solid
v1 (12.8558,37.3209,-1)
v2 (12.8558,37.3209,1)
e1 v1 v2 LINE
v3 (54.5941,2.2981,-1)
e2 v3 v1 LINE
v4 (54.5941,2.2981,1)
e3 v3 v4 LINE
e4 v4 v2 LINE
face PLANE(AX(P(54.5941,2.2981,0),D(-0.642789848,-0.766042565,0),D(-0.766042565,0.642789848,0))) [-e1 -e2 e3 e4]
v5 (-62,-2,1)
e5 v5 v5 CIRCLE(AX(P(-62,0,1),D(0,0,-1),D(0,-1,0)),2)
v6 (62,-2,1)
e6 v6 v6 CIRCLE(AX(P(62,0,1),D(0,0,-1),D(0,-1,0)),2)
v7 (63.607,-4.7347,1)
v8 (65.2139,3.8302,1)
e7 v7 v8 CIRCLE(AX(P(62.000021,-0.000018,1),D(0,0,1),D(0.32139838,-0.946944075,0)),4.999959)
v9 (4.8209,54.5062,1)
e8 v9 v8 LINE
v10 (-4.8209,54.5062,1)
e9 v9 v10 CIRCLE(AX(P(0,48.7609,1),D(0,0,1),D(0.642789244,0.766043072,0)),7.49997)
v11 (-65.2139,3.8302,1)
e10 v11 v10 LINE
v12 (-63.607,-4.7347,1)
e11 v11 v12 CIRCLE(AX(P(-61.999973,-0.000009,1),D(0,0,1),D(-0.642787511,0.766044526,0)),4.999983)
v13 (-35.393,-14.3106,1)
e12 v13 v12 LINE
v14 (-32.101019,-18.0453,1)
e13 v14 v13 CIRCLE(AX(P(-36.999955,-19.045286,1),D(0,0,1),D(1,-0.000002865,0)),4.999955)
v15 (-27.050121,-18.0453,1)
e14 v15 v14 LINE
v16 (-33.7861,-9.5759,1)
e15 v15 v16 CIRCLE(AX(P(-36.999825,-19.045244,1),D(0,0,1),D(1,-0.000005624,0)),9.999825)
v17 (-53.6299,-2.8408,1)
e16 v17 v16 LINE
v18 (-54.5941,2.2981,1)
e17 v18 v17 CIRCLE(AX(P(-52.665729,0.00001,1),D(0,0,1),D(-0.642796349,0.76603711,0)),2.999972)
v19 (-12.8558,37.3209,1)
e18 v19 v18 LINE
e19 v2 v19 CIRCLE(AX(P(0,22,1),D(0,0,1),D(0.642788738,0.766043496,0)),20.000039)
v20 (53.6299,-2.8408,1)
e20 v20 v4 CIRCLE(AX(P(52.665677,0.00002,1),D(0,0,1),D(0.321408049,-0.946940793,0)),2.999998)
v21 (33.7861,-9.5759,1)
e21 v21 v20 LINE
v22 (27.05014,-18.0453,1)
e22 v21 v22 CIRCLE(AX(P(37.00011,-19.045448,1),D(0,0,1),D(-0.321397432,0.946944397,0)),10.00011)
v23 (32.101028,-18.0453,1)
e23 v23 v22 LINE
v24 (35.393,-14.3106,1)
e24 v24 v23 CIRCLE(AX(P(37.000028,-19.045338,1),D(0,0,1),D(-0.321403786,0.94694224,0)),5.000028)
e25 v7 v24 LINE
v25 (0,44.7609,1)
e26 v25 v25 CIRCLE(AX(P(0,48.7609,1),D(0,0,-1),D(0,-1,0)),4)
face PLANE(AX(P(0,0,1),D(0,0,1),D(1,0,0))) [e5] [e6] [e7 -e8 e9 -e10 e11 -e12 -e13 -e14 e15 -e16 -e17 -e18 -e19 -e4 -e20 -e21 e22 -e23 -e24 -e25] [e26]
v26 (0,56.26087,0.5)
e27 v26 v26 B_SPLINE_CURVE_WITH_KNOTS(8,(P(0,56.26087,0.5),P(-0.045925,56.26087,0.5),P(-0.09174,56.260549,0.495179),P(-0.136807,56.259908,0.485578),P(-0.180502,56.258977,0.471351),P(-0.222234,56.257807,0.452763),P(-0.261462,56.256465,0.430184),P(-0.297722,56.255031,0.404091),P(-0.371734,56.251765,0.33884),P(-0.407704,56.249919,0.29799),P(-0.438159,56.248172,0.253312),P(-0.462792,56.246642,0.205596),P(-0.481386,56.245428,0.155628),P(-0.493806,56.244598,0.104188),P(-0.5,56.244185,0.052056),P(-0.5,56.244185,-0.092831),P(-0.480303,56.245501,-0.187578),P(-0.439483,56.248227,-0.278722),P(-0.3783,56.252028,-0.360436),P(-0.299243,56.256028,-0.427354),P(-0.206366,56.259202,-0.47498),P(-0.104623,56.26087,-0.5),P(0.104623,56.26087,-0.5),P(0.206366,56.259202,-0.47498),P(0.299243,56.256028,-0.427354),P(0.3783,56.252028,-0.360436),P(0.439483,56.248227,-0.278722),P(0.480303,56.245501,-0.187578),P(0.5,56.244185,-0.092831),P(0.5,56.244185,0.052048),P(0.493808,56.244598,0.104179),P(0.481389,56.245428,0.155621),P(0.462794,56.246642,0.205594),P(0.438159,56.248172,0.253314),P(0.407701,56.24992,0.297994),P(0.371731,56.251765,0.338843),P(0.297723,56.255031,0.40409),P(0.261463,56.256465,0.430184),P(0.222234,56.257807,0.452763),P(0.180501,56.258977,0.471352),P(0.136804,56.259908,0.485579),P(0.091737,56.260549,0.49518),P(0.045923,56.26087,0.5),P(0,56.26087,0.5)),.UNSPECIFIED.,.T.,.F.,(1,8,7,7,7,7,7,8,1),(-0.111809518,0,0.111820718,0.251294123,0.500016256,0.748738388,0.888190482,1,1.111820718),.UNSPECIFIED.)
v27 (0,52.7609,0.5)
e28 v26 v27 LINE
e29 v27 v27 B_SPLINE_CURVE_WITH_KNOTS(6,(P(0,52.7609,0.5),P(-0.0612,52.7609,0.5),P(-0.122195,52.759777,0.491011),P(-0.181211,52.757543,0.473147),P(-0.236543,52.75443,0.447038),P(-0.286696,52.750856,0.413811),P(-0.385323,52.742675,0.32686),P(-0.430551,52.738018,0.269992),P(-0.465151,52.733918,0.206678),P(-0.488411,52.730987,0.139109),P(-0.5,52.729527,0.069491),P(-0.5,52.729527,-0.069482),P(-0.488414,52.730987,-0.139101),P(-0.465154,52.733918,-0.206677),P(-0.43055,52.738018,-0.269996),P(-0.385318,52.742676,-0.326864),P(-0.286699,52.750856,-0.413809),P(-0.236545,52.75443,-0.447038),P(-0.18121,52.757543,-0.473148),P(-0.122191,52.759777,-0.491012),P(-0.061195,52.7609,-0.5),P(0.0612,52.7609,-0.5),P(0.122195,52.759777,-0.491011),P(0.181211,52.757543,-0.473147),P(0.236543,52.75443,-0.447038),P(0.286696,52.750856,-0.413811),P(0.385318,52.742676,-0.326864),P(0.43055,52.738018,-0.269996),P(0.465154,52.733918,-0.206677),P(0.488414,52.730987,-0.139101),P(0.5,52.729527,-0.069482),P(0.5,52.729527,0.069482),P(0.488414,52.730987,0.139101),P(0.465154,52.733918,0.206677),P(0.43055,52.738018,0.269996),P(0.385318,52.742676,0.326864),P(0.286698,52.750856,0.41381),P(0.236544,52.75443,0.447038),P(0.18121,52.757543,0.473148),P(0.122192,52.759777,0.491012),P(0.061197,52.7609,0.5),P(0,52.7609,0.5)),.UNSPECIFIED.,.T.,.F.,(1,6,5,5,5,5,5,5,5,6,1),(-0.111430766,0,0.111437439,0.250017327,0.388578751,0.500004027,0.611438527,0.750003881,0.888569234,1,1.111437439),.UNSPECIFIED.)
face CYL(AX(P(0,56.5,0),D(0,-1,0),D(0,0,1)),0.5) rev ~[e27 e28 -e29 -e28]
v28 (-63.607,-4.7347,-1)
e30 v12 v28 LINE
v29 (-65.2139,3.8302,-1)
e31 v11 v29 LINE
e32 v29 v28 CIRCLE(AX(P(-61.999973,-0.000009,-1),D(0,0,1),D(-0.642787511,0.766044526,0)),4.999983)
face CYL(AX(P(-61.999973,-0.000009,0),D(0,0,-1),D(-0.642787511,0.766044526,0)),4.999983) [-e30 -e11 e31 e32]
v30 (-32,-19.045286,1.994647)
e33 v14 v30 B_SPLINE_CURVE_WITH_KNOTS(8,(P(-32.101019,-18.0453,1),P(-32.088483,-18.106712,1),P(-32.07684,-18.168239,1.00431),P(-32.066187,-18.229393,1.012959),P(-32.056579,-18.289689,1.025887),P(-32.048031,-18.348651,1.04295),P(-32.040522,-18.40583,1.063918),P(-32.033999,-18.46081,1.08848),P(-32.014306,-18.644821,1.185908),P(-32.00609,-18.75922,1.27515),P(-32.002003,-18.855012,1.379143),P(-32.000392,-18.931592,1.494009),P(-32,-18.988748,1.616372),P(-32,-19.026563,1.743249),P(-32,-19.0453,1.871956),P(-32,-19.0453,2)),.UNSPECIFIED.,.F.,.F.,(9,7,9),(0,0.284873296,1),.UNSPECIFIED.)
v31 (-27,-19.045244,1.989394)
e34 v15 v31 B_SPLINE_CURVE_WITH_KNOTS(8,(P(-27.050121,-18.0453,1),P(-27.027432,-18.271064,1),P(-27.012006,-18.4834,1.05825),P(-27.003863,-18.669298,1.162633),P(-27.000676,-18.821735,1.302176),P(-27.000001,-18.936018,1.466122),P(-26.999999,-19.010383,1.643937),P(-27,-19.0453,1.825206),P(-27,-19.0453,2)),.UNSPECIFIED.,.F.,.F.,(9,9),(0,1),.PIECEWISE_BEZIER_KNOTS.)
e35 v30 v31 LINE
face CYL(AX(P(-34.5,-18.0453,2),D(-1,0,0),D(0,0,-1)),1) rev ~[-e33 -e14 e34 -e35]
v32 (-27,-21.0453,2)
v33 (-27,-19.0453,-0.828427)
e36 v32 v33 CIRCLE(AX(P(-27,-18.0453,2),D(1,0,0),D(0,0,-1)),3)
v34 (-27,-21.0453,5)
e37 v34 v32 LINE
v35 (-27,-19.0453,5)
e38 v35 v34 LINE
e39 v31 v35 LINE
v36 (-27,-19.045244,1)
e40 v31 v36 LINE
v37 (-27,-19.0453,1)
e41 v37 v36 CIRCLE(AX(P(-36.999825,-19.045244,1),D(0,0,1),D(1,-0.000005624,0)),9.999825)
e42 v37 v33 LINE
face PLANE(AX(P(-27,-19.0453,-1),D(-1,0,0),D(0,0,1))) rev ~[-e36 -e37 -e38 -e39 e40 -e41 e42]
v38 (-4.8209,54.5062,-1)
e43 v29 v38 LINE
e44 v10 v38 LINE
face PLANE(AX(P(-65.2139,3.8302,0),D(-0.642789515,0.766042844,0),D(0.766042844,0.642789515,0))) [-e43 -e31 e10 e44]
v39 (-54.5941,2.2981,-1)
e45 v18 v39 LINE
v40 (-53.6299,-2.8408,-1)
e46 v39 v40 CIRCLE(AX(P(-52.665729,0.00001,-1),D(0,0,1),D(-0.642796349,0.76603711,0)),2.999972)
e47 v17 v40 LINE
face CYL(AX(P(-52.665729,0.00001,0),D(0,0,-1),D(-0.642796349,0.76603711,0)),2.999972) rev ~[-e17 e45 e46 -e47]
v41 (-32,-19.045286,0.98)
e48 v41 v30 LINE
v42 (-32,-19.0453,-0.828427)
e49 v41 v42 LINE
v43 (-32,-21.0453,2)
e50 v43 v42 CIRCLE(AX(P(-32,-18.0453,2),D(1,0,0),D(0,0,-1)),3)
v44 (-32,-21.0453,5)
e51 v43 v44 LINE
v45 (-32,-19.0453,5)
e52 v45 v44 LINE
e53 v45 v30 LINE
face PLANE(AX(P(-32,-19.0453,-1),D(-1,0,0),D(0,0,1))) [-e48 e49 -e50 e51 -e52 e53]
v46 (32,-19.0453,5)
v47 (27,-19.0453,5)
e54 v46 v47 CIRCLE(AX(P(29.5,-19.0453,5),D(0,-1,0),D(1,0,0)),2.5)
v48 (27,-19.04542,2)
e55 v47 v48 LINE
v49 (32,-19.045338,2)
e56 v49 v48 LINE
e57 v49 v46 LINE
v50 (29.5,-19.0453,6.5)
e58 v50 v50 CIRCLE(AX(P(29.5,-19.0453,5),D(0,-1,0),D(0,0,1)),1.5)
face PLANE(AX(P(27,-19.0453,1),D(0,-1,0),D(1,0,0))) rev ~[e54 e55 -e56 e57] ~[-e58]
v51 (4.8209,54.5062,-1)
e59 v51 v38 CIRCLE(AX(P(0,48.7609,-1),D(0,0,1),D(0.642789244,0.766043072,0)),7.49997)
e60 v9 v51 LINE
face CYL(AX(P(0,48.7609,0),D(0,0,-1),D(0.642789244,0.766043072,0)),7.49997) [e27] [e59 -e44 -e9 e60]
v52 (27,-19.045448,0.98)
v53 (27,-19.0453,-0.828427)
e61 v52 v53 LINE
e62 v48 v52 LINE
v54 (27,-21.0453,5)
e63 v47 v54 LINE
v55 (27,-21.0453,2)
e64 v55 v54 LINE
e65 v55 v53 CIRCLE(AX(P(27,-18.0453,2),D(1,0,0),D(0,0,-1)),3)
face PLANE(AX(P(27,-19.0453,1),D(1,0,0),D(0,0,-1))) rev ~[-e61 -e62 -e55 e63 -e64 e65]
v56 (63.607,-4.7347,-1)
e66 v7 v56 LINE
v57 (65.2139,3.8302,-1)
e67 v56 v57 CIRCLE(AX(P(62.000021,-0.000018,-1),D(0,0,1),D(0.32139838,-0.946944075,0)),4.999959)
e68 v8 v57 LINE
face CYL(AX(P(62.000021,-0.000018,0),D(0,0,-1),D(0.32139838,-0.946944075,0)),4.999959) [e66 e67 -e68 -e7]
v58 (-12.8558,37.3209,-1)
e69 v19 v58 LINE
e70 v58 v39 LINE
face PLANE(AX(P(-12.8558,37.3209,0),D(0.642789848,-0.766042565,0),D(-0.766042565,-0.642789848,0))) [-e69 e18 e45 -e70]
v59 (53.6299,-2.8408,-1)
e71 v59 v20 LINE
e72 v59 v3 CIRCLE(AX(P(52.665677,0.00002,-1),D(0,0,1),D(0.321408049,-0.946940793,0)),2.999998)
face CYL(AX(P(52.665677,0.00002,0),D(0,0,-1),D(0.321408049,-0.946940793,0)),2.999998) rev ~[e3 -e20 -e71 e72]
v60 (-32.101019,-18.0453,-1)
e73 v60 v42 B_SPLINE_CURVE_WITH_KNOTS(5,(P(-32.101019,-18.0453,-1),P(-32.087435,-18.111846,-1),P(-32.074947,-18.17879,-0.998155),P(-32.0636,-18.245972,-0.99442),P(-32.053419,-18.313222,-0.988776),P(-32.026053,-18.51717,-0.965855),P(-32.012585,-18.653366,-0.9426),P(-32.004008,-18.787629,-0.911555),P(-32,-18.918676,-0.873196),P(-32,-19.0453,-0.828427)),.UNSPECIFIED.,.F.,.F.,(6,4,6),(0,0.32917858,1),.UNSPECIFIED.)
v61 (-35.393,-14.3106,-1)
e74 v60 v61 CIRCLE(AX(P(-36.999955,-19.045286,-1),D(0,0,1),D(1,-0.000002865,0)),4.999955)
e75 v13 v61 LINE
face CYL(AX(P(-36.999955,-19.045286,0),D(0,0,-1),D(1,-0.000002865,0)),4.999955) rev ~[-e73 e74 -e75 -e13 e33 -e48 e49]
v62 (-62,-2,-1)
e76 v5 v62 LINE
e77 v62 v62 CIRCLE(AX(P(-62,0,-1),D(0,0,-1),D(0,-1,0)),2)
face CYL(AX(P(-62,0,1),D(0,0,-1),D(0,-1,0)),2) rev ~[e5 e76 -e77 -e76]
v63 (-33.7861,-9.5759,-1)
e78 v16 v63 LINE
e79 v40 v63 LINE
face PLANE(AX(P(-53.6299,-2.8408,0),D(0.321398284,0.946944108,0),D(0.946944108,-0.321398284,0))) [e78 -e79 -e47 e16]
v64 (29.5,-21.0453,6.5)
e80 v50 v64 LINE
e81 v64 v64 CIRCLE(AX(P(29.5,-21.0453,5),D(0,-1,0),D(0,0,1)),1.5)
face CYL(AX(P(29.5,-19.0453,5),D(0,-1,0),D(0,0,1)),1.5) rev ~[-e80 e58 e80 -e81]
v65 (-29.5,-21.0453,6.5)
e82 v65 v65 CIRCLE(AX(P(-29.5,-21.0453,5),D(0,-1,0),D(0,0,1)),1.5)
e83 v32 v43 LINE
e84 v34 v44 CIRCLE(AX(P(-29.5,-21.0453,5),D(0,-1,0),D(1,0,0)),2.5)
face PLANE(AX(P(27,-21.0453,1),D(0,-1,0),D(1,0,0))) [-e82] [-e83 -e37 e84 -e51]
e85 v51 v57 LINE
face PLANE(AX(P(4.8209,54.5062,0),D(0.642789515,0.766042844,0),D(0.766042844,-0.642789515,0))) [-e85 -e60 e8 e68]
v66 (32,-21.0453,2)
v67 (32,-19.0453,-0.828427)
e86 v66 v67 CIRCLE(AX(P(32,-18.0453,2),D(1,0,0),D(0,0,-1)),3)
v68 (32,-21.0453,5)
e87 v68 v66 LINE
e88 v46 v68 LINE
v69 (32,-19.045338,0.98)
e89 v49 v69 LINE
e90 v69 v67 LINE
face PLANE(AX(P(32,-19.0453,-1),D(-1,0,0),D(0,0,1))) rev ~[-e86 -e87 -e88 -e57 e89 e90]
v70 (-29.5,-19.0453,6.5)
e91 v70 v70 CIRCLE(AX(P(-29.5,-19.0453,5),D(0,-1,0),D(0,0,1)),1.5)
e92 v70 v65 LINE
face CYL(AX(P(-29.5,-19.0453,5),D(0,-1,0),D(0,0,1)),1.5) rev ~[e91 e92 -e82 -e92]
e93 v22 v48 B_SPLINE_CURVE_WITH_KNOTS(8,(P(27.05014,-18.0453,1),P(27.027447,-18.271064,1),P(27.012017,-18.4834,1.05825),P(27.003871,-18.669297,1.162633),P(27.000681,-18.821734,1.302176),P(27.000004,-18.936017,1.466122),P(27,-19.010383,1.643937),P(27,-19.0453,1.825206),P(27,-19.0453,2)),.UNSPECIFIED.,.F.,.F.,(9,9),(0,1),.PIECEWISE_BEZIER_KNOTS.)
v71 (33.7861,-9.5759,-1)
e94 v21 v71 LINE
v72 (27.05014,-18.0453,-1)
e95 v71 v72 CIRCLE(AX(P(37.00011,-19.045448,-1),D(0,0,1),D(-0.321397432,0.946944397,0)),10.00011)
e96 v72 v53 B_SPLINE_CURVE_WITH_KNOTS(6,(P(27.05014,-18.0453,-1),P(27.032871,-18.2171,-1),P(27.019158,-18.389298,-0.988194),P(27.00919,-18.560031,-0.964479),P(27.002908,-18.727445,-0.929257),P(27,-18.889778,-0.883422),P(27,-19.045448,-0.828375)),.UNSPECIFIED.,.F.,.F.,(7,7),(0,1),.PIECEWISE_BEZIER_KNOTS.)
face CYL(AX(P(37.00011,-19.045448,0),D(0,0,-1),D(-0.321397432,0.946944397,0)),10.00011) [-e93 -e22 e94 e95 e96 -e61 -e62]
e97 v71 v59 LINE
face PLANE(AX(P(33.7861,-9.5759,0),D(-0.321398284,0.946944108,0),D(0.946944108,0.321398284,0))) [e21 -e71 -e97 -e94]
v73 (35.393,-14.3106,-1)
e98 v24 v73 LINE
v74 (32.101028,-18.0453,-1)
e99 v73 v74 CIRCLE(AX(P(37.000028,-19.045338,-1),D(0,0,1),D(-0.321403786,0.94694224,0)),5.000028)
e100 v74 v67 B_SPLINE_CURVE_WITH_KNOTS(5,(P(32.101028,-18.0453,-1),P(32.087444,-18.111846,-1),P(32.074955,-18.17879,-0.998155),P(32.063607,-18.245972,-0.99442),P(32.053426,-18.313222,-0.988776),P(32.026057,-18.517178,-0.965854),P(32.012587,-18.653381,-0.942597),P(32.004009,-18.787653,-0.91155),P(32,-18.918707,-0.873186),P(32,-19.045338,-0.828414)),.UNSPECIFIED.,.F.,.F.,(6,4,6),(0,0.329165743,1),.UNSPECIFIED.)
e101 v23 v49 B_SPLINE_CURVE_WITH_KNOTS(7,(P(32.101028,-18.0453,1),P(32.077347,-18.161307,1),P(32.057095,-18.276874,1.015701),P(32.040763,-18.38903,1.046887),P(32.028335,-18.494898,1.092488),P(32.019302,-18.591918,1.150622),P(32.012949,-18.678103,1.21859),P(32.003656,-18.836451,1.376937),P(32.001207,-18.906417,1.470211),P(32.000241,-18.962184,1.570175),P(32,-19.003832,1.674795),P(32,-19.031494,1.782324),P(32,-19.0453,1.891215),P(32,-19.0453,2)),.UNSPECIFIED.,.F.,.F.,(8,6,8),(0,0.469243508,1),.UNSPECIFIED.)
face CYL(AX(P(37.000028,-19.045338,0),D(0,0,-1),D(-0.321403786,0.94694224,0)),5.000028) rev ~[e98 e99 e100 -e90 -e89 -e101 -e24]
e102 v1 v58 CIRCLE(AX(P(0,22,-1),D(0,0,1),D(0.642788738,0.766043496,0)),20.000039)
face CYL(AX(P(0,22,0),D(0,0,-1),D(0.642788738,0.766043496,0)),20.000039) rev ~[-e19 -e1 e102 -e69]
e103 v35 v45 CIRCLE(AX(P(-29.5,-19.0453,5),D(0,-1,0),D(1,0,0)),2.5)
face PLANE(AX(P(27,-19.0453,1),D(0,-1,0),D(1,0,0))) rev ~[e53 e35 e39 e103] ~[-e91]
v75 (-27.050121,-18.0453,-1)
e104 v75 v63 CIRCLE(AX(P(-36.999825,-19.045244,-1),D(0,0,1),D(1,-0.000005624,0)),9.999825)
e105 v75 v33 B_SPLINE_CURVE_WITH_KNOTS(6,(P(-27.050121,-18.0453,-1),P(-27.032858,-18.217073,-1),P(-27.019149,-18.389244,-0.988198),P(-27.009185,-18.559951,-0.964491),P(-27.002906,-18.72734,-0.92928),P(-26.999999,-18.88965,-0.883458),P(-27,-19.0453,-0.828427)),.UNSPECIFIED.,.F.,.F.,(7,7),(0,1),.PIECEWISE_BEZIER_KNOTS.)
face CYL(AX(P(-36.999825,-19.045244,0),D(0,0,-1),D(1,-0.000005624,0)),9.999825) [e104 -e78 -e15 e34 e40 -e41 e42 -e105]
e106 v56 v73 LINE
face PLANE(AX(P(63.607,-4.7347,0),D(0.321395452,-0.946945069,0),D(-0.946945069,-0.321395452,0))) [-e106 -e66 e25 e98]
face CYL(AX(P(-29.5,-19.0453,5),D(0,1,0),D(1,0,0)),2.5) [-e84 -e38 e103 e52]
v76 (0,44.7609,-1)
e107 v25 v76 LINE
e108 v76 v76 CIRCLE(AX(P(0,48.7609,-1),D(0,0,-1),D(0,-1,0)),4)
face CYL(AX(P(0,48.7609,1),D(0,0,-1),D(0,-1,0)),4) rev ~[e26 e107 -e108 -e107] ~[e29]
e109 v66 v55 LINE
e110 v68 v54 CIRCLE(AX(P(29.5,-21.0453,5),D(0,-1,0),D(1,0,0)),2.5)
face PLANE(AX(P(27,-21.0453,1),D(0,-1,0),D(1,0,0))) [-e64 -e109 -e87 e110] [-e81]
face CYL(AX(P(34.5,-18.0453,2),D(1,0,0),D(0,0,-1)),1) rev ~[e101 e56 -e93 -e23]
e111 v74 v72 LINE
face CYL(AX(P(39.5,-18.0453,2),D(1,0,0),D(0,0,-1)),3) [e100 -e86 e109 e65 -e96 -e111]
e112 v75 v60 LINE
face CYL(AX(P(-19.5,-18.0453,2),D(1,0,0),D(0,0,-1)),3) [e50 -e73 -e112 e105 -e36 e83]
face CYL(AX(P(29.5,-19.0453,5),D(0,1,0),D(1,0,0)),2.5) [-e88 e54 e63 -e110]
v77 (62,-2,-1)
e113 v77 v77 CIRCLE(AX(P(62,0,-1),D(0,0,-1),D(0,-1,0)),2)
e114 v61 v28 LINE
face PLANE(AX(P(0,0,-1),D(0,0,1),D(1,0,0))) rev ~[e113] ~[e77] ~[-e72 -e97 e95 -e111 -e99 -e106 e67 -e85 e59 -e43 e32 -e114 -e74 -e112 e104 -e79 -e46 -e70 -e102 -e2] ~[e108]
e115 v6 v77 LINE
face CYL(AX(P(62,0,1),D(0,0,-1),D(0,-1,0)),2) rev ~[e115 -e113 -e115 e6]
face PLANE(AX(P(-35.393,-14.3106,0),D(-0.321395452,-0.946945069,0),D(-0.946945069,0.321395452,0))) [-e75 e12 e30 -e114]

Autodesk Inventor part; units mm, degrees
ref_plane "YZ Plane" through (0, 0, 0) normal (1, 0, 0) x (0, 1, 0)
sketch "Sketch1" plane through (0, 0, 0) normal (0, 0, 1) x (1, 0, 0)
  line L0 (-14.081, 0) -> (14.081, 0) construction
  line L1 (0, -22) -> (0, 22) construction
  arc A0 (12.8558, 37.3209) -> (-12.8558, 37.3209) centre (0, 22) ccw
  line L2 (-65.2139, 3.8302) -> (-4.8209, 54.5062)
  arc A1 (4.8209, 54.5062) -> (-4.8209, 54.5062) centre (0, 48.7609) ccw
  line L3 (4.8209, 54.5062) -> (65.2139, 3.8302)
  arc A2 (63.607, -4.7347) -> (65.2139, 3.8302) centre (62, 0) ccw
  line L4 (63.607, -4.7347) -> (35.393, -14.3106)
  arc A3 (35.393, -14.3106) -> (32, -19.0453) centre (37, -19.0453) ccw
  line L5 (32, -19.0453) -> (32, -21.0453) construction
  line L6 (27, -21.0453) -> (27, -19.0453) construction
  arc A4 (33.7861, -9.5759) -> (27, -19.0453) centre (37, -19.0453) ccw
  line L7 (33.7861, -9.5759) -> (53.6299, -2.8408)
  arc A5 (53.6299, -2.8408) -> (54.5941, 2.2981) centre (52.6657, 0) ccw
  line L8 (54.5941, 2.2981) -> (12.8558, 37.3209)
  line L9 (-12.8558, 37.3209) -> (-54.5941, 2.2981)
  arc A6 (-54.5941, 2.2981) -> (-53.6299, -2.8408) centre (-52.6657, 0) ccw
  line L10 (-53.6299, -2.8408) -> (-33.7861, -9.5759)
  arc A7 (-27, -19.0453) -> (-33.7861, -9.5759) centre (-37, -19.0453) ccw
  line L11 (-27, -19.0453) -> (-27, -21.0453) construction
  line L12 (-32, -21.0453) -> (-32, -19.0453) construction
  arc A8 (-32, -19.0453) -> (-35.393, -14.3106) centre (-37, -19.0453) ccw
  line L13 (-35.393, -14.3106) -> (-63.607, -4.7347)
  arc A9 (-65.2139, 3.8302) -> (-63.607, -4.7347) centre (-62, 0) ccw
  line L14 (-32, -19.0453) -> (-27, -19.0453)
  line L15 (32, -19.0453) -> (27, -19.0453)
  point P0 (0, 0)
  point P1 (0, 0)
  point P2 (-29.5, -21.0453)
  point P3 (29.5, -21.0453)
  dimension "d0" = 40
  dimension "d1" = 22
  dimension "d2" = 8
  dimension "d3" = 3
  dimension "d4" = 3
  dimension "d5" = 5
  dimension "d6" = 5
  dimension "d7" = 5
  dimension "d8" = 5
  dimension "d9" = 7.5
  dimension "d10" = 8
  dimension "d11" = 124
  dimension "d12" = 62
  dimension "d13" = 10
  dimension "d14" = 5
  dimension "d15" = 10
  dimension "d16" = 5
  dimension "d17" = 5
  dimension "d18" = 48.7609
  dimension "d20" = 29.5
  dimension "d21" = 59
extrude "Extrusion1" add sketch "Sketch1" along normal mid plane 2
ref_plane "Work Plane5" through (27, -19.0453, 1) normal (0, -1, 0) x (1, 0, 0)
sketch "Sketch5" plane through (27, -19.0453, 1) normal (0, -1, 0) x (1, 0, 0)
  line L0 (-54, -2) -> (-59, -2) projected
  line L1 (-54, -2) -> (-54, 0) projected
  line L2 (-59, 0) -> (-54, 0) projected
  line L3 (-59, -2) -> (-59, 0) projected
  line L4 (-54, -2) -> (-59, -2) projected
  line L5 (5, -2) -> (5, 0) projected
  line L6 (0, 0) -> (5, 0) projected
  line L7 (0, 0) -> (0, -2) projected
  line L8 (5, -2) -> (0, -2) projected
  line L9 (0, 0) -> (5, 0) projected
  line L10 (5, 0) -> (5, 4)
  arc A0 (5, 4) -> (0, 4) centre (2.5, 4) ccw
  line L11 (0, 4) -> (0, 0)
  line L12 (38.2139, 0) -> (-22.1791, 0) projected
  line L13 (-54, 0) -> (-54, 4)
  arc A1 (-54, 4) -> (-59, 4) centre (-56.5, 4) ccw
  line L14 (-59, 4) -> (-59, 0)
  point P0 (-27, -1)
  dimension "d29" = 2.5
  dimension "d30" = 2.5
  dimension "d31" = 4
  dimension "d32" = 4
extrude "Extrusion2" add sketch "Sketch5" along normal blind 2
fillet "Fillet3" radius 1 2 edges at (-29.5, -19.0453, 1) (29.5, -19.0453, 1)
fillet "Fillet4" radius 3 2 edges at (-29.5, -21.0453, -1) (29.5, -21.0453, -1)
sketch "Sketch7" plane through (27, -19.0453, 1) normal (0, 1, 0) x (1, 0, 0)
  arc A0 (-59, -4) -> (-54, -4) centre (-56.5, -4) ccw projected
  arc A1 (0, -4) -> (5, -4) centre (2.5, -4) ccw projected
  point P0 (-27, 1)
hole "Hole2" at (-29.5, -19.0453, 5) at (29.5, -19.0453, 5) direction (0, -1, 0) diameter 3 depth 2
sketch "Sketch8" plane through (0, 0, 1) normal (0, 0, 1) x (1, 0, 0)
  arc A0 (-65.2139, 3.8302) -> (-63.607, -4.7347) centre (-62, 0) ccw projected
  arc A1 (63.607, -4.7347) -> (65.2139, 3.8302) centre (62, 0) ccw projected
  point P0 (0, 0)
hole "Hole3" at (-62, 0, 1) at (62, 0, 1) direction (0, 0, -1) diameter 4 depth 2
sketch "Sketch9" plane through (0, 0, 1) normal (0, 0, 1) x (1, 0, 0)
  arc A0 (4.8209, 54.5062) -> (-4.8209, 54.5062) centre (0, 48.7609) ccw projected
  point P0 (0, 0)
hole "Hole4" at (0, 48.7609, 1) direction (0, 0, -1) diameter 8 depth 2
ref_plane "Work Plane6" through (0, 56.5, 0) normal (0, 1, 0) x (-1, 0, 0)
sketch "Sketch10" plane through (0, 56.5, 0) normal (0, 1, 0) x (-1, 0, 0)
  point P0 (0, 0)
  point P1 (0, 0)
hole "Hole5" at (0, 56.5, 0) direction (0, -1, 0) diameter 1 depth 4
equation "\"d4\" = d3"
equation "\"d6\" = d5"
equation "\"d10\" = d2"
equation "\"d12\" = 0.5 * d11"
equation "\"d15\" = d13"
equation "\"d16\" = d14"
equation "\"d21\" = 2 * d20"
equation "\"d32\" = d31"
properties part number "01"
